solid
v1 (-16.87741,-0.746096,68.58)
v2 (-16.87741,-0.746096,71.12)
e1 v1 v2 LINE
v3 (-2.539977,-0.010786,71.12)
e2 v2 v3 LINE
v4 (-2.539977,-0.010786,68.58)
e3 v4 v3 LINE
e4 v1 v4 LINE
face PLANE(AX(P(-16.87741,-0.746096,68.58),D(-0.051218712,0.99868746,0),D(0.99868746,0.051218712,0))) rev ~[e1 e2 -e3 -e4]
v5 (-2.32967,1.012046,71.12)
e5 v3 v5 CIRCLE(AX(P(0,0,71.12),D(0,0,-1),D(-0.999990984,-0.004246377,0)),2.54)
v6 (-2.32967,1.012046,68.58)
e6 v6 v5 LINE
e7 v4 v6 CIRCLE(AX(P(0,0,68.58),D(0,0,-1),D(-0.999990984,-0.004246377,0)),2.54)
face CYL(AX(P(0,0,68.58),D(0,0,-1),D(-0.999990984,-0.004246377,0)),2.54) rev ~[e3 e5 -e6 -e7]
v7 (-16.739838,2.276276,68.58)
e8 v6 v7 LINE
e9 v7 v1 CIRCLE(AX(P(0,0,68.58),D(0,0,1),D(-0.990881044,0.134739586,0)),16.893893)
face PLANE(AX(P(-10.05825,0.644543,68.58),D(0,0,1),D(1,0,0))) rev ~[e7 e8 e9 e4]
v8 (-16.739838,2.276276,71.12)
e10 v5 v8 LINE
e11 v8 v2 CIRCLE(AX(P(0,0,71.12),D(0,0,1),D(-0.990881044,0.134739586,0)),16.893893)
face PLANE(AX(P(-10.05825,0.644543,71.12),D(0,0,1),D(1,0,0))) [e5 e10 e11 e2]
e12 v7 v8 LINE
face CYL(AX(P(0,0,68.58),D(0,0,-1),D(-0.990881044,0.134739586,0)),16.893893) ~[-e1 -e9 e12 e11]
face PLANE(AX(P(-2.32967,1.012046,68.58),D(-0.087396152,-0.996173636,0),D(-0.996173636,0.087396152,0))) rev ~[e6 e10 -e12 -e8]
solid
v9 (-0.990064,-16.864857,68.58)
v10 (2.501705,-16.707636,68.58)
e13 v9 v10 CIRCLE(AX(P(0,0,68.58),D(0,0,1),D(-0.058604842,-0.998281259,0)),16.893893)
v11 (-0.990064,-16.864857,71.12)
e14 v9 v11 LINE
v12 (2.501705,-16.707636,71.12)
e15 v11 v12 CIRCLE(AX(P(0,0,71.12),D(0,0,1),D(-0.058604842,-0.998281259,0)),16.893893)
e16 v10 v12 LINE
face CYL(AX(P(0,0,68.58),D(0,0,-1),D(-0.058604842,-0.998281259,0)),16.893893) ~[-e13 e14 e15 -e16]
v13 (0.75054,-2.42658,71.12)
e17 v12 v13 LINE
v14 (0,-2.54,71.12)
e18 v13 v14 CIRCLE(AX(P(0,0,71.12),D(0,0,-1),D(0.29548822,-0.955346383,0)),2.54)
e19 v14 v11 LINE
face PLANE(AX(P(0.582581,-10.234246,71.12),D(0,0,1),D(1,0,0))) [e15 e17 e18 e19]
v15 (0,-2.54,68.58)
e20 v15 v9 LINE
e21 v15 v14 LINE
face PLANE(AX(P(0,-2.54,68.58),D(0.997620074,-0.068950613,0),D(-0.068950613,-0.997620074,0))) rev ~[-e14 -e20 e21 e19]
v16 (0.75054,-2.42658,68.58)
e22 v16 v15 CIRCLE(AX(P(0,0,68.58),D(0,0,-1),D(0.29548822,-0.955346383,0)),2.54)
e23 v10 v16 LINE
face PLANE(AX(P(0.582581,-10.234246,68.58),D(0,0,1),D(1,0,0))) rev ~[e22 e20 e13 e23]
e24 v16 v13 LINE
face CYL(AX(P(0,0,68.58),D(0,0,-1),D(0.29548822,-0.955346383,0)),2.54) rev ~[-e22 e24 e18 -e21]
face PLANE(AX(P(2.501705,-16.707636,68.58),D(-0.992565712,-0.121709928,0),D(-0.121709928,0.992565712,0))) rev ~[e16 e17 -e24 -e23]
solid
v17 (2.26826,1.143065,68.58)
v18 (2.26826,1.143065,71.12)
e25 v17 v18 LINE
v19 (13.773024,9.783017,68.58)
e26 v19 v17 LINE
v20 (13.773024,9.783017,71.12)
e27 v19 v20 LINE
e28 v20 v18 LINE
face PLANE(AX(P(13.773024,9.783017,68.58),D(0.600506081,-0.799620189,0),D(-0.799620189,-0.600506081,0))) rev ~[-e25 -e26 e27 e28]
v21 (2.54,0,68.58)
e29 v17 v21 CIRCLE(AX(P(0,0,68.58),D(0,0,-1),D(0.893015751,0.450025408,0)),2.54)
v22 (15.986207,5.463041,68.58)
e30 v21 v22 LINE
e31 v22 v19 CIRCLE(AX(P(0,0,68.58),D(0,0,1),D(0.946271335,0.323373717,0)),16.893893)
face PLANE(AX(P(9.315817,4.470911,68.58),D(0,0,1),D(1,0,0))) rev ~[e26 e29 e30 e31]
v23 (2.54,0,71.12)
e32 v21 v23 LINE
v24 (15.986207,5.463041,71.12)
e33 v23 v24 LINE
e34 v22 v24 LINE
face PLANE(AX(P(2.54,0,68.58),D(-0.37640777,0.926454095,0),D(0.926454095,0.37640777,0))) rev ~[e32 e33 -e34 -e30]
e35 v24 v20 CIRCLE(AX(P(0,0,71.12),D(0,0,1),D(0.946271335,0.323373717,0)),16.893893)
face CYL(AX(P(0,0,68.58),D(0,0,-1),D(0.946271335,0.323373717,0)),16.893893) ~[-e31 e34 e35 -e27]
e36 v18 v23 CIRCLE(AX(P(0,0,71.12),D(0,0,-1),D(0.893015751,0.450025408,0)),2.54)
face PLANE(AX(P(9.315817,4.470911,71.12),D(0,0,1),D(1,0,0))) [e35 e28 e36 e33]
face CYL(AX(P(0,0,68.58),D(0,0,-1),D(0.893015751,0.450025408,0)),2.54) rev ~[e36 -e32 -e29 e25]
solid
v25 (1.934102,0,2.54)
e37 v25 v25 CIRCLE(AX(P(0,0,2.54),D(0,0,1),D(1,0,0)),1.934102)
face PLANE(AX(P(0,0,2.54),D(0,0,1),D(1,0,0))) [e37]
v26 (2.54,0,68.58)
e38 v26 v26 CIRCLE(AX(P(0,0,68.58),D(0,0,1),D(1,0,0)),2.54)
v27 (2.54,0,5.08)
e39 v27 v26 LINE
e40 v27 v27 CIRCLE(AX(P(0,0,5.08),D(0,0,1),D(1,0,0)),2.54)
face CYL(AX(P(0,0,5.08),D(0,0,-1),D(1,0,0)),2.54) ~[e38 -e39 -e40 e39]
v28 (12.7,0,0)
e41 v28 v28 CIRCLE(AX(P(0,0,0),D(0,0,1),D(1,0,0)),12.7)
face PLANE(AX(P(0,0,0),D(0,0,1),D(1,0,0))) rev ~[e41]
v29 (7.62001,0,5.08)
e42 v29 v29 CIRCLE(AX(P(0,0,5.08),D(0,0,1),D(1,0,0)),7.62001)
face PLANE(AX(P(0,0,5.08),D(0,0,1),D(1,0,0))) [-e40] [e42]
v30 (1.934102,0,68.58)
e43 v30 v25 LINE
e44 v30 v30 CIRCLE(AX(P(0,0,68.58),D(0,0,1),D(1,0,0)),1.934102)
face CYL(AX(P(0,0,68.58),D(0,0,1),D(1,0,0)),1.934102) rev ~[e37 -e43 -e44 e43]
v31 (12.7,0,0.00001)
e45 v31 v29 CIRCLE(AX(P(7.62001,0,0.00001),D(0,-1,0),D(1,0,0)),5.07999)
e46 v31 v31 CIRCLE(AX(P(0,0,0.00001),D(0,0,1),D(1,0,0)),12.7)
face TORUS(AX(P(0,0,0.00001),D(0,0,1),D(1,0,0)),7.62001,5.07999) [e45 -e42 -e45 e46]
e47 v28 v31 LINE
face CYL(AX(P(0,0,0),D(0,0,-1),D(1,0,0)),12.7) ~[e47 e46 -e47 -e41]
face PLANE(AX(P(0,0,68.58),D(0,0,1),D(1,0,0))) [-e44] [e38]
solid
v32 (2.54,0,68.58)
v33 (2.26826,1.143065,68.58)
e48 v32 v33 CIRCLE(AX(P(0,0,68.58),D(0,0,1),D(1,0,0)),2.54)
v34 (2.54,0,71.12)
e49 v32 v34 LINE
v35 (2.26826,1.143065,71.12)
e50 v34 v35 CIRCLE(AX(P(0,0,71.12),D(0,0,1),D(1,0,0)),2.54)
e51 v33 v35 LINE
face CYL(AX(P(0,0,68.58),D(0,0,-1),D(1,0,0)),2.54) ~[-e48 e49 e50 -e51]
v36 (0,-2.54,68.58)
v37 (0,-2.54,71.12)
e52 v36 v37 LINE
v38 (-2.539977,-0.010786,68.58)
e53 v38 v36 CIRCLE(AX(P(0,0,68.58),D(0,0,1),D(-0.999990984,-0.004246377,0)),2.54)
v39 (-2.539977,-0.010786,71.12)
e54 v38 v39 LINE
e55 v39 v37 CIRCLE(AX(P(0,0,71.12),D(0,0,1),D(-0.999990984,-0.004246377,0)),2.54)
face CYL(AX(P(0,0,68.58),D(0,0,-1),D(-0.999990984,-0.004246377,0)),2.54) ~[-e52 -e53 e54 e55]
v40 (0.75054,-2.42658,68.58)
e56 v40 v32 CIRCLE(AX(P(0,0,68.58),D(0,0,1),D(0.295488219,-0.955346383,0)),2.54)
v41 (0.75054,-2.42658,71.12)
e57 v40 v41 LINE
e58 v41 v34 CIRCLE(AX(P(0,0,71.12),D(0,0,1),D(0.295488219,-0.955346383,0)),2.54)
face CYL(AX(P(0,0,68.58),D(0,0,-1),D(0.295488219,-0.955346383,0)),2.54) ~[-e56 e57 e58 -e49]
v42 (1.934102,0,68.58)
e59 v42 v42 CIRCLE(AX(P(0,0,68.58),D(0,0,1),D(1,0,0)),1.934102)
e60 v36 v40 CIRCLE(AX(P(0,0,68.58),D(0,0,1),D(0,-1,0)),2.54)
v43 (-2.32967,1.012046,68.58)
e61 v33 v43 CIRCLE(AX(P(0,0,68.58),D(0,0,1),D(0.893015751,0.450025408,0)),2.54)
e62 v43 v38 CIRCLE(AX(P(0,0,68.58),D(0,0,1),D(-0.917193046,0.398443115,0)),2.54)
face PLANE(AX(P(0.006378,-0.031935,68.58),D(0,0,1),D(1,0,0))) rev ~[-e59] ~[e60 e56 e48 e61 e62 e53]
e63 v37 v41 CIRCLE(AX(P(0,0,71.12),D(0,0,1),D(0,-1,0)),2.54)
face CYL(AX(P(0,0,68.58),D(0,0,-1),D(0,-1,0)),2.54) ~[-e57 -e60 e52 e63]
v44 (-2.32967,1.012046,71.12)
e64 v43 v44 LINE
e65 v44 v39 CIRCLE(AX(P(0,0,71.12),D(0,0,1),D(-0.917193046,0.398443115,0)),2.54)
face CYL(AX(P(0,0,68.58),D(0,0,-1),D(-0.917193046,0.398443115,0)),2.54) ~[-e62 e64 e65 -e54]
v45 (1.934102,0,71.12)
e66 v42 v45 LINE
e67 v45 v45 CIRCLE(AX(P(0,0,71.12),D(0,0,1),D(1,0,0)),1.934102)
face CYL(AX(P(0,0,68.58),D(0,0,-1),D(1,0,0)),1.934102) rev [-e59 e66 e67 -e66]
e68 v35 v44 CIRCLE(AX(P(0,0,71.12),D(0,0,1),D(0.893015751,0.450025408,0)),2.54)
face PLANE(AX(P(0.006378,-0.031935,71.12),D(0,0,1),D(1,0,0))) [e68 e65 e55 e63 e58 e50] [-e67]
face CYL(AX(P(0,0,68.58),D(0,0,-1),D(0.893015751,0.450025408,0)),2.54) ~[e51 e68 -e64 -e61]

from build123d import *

# Parameters (mm, degrees)
F0_R      = 12.7
F1_DEPTH  = 5.08
F2_R      = 2.54
F3_DEPTH  = 63.5
F4_R      = 1.9341022534
F5_DEPTH  = 66.04
F7_R      = 5.07999
F8_DEPTH  = 2.54
F9_DEPTH  = 2.54
F10_DEPTH = 2.54


# Not quite as in the source:
# - a fillet or chamfer is up to 0.001 mm smaller than in the source, because OpenCascade refuses the exact size
# - the program builds the solid bodies; features that only make, move or delete a surface that nothing else refers to are left out


with BuildPart() as f1:
    # F0 (on Top) → F1 (new body)
    with BuildSketch(Plane.XY):
        Circle(F0_R)
    extrude(amount=F1_DEPTH)

    # F2 (on face) → F3 (join)
    with BuildSketch(Plane.XY.offset(5.08)):
        Circle(F2_R)
    extrude(amount=F3_DEPTH)

    # F4 (on face) → F5 (cut)
    with BuildSketch(Plane.XY.offset(68.58)):
        Circle(F4_R)
    extrude(amount=-F5_DEPTH, mode=Mode.SUBTRACT)

    # F7 (radius 5.08 in the source; OpenCascade refuses exactly that, so slightly less here)
    f7_edges = [f1.edges().sort_by_distance(p)[0] for p in [
        (-12.7, 0, 5.08),
    ]]
    fillet(f7_edges, radius=F7_R)


with BuildPart() as f8:
    # F4 (on face) → F8 (new body)
    with BuildSketch(Plane.XY.offset(68.58)):
        with BuildLine():
            Line((-2.3296703372, 1.0120455128), (-16.7398383993, 2.2762761567))
            ThreePointArc((-16.7398383993, 2.2762761567), (-16.876419297, 0.7681760801), (-16.8774098693, -0.7460957586))
            Line((-16.8774098693, -0.7460957586), (-2.5399770996, -0.0107857982))
            ThreePointArc((-2.5399770996, -0.0107857982), (-2.4879534787, 0.5115539928), (-2.3296703372, 1.0120455128))
        make_face()
    extrude(amount=F8_DEPTH)


with BuildPart() as f9:
    # F4 (on face) → F9 (new body)
    with BuildSketch(Plane.XY.offset(68.58)):
        with BuildLine():
            Line((2.54, 0), (15.9862067387, 5.4630409925))
            ThreePointArc((15.9862067387, 5.4630409925), (15.0355746118, 7.7029292395), (13.7730240822, 9.7830174491))
            Line((13.7730240822, 9.7830174491), (2.2682600086, 1.143064536))
            ThreePointArc((2.2682600086, 1.143064536), (2.4711313625, 0.5874604575), (2.54, 0))
        make_face()
    extrude(amount=F9_DEPTH)


with BuildPart() as f9b:
    # F4 (on face) → F9, piece 2 (new body)
    with BuildSketch(Plane.XY.offset(68.58)):
        with BuildLine():
            ThreePointArc((-0.990063935, -16.8648568385), (0.7598975693, -16.8767940813), (2.5017050348, -16.7076358201))
            Line((2.5017050348, -16.7076358201), (0.750540077, -2.4265798138))
            ThreePointArc((0.750540077, -2.4265798138), (0.3795308109, -2.5114848922), (0, -2.54))
            Line((0, -2.54), (-0.990063935, -16.8648568385))
        make_face()
    extrude(amount=F9_DEPTH)


with BuildPart() as f10:
    # F4 (on face) → F10 (new body)
    with BuildSketch(Plane.XY.offset(68.58)):
        with BuildLine():
            ThreePointArc((0.750540077, -2.4265798138), (2.0442568082, -1.507519188), (2.54, 0))
            ThreePointArc((2.54, 0), (2.4711313625, 0.5874604575), (2.2682600086, 1.143064536))
            ThreePointArc((2.2682600086, 1.143064536), (-0.0723484846, 2.5389694163), (-2.3296703372, 1.0120455128))
            ThreePointArc((-2.3296703372, 1.0120455128), (-2.4879534787, 0.5115539928), (-2.5399770996, -0.0107857982))
            ThreePointArc((-2.5399770996, -0.0107857982), (-1.7922338118, -1.7998605401), (0, -2.54))
            ThreePointArc((0, -2.54), (0.3795308109, -2.5114848922), (0.750540077, -2.4265798138))
        make_face()
        Circle(F4_R, mode=Mode.SUBTRACT)
    extrude(amount=F10_DEPTH)


solid = Compound([f1.part, f8.part, f9.part, f9b.part, f10.part])
